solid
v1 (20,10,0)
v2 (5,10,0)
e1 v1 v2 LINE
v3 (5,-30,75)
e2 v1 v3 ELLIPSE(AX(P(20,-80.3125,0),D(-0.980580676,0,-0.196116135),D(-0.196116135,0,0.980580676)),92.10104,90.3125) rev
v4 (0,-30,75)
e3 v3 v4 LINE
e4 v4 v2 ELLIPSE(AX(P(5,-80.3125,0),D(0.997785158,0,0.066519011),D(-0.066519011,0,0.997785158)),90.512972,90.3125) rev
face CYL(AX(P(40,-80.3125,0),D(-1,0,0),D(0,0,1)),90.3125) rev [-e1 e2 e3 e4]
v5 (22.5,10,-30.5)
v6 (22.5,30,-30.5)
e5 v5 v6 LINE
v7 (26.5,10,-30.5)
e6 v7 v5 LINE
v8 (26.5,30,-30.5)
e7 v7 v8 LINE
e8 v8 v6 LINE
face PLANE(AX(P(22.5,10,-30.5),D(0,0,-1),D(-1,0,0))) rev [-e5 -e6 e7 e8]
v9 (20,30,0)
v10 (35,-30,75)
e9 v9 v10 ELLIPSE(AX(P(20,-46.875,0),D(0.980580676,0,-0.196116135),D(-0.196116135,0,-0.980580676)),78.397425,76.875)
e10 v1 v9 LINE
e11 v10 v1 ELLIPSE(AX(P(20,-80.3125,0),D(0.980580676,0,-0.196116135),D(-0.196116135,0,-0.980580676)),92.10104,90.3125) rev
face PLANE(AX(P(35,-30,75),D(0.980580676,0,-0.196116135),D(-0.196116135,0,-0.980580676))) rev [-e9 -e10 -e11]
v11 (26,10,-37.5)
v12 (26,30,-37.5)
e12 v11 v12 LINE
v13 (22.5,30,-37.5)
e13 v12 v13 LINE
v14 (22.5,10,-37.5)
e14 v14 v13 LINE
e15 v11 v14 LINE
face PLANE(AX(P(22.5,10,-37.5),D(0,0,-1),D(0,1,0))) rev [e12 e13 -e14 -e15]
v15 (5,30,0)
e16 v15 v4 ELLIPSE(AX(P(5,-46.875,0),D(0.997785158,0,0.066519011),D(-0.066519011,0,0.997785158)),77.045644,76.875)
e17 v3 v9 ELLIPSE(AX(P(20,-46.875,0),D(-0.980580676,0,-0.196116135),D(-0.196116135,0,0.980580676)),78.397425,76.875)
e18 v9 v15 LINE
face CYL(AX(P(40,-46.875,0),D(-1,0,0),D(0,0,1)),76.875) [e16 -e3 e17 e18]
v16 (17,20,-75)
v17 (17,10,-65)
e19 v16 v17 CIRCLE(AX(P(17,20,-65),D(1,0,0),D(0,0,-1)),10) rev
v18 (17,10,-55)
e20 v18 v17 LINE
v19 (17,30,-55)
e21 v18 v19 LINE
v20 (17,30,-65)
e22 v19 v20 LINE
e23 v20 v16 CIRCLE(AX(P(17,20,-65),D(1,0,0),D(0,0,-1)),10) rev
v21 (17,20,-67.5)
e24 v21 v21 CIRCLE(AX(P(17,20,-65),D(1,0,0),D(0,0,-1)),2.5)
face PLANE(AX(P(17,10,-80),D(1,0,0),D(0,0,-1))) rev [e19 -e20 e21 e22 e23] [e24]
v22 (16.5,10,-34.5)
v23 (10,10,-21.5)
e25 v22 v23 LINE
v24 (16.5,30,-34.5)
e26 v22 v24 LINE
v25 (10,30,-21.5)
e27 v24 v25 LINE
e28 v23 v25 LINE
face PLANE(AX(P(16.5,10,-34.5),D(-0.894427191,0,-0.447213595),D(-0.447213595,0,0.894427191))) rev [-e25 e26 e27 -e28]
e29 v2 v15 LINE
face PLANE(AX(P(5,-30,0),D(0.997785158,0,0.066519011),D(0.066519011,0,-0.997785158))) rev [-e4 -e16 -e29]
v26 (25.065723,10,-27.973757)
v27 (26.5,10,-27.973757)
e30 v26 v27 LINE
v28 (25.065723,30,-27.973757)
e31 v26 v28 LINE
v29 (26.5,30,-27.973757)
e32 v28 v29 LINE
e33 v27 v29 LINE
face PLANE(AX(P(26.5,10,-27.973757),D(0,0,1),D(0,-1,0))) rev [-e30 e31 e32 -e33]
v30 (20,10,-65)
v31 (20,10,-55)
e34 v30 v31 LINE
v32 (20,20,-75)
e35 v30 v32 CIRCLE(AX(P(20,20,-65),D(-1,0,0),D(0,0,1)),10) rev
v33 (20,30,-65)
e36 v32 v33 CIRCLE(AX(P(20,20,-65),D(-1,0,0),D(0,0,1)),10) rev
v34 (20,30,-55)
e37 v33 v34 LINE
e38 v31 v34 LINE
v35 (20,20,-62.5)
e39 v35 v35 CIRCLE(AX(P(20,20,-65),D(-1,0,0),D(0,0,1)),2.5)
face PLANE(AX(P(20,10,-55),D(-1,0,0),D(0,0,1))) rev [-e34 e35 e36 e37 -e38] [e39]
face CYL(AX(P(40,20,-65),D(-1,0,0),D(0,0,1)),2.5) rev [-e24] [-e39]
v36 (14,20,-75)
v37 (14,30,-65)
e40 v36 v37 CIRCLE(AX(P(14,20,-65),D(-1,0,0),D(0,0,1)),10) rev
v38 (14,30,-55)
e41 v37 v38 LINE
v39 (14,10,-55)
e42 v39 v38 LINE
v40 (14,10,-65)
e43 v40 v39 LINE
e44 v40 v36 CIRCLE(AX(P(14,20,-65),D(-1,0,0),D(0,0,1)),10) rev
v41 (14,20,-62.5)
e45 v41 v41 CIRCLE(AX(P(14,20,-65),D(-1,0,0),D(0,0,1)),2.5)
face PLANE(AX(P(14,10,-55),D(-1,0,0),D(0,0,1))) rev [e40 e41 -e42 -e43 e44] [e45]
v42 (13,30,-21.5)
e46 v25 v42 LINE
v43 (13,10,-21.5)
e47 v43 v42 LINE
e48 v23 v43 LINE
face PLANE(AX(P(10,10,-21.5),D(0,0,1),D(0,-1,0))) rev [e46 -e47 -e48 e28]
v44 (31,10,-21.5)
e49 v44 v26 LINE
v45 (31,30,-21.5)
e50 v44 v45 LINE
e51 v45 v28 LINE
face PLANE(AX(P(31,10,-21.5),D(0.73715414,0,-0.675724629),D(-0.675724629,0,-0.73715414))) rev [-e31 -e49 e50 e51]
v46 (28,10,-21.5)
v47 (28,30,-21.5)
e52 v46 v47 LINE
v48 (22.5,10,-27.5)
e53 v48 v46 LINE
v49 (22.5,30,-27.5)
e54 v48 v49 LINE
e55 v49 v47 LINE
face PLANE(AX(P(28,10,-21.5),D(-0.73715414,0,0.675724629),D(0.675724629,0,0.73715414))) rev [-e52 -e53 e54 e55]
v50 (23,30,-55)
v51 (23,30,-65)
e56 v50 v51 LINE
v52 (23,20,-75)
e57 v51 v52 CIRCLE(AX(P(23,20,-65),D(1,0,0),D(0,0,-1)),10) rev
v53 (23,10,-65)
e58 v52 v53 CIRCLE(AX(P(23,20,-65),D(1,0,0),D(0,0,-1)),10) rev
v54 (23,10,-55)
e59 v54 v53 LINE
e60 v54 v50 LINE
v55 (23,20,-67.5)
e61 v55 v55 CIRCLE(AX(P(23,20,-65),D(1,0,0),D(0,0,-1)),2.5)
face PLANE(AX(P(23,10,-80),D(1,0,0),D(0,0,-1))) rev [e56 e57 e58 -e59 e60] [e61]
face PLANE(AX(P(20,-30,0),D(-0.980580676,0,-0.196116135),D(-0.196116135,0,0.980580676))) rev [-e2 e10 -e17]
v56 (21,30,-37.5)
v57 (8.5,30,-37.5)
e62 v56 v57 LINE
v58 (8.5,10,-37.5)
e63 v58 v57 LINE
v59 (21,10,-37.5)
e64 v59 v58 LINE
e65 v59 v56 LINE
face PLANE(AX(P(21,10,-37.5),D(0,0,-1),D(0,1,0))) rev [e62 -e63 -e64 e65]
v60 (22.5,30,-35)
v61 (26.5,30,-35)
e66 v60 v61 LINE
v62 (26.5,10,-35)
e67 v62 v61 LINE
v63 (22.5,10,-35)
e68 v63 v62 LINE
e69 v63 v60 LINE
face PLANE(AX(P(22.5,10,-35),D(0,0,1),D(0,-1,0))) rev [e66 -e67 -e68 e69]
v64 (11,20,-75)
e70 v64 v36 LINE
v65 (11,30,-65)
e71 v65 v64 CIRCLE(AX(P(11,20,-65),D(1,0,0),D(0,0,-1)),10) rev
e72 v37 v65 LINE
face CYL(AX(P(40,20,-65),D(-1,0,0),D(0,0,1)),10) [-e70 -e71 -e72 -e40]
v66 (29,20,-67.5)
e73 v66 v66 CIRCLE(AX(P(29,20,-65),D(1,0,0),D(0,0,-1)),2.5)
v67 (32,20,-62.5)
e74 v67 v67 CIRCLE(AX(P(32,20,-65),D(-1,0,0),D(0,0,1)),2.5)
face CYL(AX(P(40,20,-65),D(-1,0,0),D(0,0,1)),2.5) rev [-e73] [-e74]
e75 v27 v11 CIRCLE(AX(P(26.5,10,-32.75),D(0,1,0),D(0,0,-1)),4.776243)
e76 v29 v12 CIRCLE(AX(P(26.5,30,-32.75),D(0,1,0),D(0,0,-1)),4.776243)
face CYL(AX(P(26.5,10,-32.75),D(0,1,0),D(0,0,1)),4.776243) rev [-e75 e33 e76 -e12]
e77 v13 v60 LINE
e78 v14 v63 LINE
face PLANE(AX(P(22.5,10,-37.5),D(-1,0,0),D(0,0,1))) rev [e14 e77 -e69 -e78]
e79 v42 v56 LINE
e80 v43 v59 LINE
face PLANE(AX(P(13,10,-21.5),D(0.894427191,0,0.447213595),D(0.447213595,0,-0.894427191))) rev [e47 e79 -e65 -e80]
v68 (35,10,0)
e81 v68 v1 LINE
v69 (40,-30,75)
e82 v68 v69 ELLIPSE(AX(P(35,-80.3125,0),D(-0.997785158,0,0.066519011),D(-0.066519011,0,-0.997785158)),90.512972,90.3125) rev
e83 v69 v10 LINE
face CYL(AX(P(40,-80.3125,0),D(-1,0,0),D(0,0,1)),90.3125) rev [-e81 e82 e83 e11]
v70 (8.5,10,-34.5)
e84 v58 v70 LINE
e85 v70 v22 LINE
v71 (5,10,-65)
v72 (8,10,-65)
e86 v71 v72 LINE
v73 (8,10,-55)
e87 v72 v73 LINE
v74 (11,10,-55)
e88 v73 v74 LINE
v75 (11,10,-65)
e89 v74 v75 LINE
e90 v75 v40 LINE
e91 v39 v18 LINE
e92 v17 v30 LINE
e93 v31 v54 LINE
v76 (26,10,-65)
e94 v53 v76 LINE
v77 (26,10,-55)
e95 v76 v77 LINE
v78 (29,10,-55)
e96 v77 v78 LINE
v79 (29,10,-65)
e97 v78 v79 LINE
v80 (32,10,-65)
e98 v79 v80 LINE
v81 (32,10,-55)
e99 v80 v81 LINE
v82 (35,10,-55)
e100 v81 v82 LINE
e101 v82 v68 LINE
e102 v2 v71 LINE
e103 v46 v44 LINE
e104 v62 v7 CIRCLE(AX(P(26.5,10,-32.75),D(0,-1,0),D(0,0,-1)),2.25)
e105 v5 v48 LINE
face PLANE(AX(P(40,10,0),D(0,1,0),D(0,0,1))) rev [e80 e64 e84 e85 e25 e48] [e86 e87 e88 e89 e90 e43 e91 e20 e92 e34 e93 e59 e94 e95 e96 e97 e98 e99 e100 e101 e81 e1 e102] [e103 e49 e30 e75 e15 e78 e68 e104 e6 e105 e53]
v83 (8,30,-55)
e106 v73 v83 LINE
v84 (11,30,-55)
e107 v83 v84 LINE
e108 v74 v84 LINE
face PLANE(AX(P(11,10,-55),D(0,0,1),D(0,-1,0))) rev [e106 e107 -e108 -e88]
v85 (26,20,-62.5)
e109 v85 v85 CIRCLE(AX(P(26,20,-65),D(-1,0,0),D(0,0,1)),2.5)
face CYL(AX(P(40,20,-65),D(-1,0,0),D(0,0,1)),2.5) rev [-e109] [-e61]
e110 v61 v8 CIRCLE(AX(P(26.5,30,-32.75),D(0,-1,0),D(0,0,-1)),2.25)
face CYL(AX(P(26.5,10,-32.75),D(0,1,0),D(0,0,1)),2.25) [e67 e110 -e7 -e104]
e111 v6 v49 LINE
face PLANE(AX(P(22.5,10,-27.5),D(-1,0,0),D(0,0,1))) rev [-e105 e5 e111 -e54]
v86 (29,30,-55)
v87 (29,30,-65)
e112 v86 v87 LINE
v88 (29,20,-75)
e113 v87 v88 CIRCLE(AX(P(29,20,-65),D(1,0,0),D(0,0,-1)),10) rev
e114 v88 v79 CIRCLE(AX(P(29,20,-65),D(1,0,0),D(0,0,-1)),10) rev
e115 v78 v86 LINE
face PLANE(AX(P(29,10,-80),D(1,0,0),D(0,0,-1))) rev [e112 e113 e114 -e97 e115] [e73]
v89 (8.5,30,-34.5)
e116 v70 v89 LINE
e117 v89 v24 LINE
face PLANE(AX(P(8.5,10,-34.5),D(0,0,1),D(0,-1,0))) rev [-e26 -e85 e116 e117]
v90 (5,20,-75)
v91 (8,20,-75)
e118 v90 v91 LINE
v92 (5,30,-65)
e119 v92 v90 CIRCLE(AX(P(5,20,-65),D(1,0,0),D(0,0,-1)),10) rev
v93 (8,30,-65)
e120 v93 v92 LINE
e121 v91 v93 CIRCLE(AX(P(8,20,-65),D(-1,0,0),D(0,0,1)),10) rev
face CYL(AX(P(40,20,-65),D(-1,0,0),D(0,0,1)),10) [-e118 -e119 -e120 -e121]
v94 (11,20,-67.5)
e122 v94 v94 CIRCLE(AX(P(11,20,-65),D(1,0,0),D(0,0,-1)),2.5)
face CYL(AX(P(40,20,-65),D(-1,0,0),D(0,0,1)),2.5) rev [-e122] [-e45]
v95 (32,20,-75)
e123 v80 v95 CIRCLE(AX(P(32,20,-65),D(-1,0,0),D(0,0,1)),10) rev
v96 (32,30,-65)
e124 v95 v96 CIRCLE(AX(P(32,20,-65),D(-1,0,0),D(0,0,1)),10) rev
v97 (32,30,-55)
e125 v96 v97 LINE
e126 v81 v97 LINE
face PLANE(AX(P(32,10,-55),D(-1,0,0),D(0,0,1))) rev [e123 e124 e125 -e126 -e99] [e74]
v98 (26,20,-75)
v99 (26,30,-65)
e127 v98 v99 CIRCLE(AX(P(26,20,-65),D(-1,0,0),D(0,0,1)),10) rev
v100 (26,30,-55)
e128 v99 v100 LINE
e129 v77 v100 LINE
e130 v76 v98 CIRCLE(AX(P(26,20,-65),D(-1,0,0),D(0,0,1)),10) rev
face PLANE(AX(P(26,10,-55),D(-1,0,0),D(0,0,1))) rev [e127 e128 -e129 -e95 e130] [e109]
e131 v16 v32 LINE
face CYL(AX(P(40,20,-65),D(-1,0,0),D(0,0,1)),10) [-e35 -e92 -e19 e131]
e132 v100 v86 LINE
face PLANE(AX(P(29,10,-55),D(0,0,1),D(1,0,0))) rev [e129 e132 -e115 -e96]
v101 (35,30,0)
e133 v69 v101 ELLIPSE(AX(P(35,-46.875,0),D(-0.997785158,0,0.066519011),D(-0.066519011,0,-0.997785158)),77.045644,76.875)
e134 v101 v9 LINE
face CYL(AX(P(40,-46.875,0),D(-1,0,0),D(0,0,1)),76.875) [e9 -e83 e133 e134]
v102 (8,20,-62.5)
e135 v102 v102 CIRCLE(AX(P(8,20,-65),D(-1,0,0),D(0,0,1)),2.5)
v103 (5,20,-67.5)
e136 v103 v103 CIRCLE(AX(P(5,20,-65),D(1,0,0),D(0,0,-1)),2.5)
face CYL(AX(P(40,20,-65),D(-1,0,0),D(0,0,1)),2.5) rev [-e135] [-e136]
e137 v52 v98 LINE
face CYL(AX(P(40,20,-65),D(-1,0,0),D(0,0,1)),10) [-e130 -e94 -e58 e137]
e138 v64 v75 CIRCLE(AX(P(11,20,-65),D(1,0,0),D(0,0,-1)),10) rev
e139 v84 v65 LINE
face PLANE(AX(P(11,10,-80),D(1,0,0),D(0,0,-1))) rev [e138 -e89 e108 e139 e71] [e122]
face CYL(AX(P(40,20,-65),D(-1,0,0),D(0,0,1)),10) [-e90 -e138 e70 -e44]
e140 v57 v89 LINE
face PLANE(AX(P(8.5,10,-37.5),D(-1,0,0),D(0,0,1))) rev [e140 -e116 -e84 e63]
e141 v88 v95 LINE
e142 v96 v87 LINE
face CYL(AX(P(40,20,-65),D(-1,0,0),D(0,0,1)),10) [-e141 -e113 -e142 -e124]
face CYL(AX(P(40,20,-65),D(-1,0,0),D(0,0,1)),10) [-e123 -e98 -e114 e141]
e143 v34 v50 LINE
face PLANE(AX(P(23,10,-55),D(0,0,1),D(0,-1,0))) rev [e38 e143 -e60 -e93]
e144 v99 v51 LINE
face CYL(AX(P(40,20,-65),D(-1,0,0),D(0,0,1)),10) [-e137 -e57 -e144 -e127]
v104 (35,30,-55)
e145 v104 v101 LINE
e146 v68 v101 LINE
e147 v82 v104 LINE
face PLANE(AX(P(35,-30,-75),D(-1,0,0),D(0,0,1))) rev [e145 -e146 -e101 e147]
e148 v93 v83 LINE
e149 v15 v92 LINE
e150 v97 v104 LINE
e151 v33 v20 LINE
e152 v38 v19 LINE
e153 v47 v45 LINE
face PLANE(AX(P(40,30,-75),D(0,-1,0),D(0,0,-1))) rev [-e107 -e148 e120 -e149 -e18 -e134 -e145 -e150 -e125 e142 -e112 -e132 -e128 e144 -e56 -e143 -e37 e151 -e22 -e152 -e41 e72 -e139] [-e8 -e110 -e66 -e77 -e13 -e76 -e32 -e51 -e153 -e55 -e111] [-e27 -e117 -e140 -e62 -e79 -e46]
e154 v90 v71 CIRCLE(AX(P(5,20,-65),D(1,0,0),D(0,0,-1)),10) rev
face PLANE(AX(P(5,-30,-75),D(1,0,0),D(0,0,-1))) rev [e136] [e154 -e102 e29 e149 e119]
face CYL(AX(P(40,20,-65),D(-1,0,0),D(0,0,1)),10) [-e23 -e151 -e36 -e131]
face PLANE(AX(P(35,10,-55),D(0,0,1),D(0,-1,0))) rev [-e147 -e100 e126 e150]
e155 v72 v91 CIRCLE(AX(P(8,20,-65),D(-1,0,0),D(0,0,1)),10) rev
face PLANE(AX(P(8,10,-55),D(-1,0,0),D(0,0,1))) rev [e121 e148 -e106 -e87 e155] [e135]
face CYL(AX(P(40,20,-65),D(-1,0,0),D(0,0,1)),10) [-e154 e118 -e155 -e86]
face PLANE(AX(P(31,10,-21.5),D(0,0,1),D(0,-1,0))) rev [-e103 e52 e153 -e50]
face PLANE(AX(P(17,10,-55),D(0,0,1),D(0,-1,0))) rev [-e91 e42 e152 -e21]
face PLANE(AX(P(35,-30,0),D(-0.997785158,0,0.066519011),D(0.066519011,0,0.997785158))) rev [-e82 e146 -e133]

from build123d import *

# Parameters (mm, degrees)
ESQUISSE1_R             = 2.5
BOSS_EXTRU_1_DEPTH      = 40
ENL_V_MAT_EXTRU_1_DEPTH = 60
CONG_1_R                = 10
ENL_V_MAT_EXTRU_2_DEPTH = 20
ENL_V_MAT_EXTRU_3_DEPTH = 20


with BuildPart() as part:
    # Esquisse1 → Boss.-Extru.1 (new body)
    with BuildSketch(Plane(origin=(0, 0, 0), x_dir=(0, 0, -1), z_dir=(1, 0, 0))):
        with BuildLine():
            Line((0, 10), (75, 10))
            Line((75, 10), (75, 30))
            Line((75, 30), (0, 30))
            ThreePointArc((0, 30), (-48.023431781, 13.154289726), (-75, -30))
            ThreePointArc((-75, -30), (-42.5, -0.625), (0, 10))
        make_face()
        with Locations((65, 20)):
            Circle(ESQUISSE1_R, mode=Mode.SUBTRACT)
    extrude(amount=BOSS_EXTRU_1_DEPTH)

    # Esquisse2 → Enlèv. mat.-Extru.1 (cut)
    with BuildSketch(Plane(origin=(0, 30, 0), x_dir=(1, 0, 0), z_dir=(0, 1, 0))):
        Polygon((20, 0), (5, -75), (35, -75), align=None)
        Polygon((0, 75), (5, 75), (5, 0), (0, -75), align=None)
        Polygon((40, 75), (35, 75), (35, 0), (40, -75), align=None)
    extrude(amount=-ENL_V_MAT_EXTRU_1_DEPTH, mode=Mode.SUBTRACT)

    # Congé1
    cong_1_edges = [part.edges().sort_by_distance(p)[0] for p in [
        (20, 10, -75),
        (20, 30, -75),
    ]]
    fillet(cong_1_edges, radius=CONG_1_R - 0.0001)  # a hair under: the kernel refuses the full size

    # Esquisse3 → Enlèv. mat.-Extru.2 (cut)
    with BuildSketch(Plane(origin=(0, 30, 0), x_dir=(1, 0, 0), z_dir=(0, 1, 0))):
        Polygon((35, 82), (35, 55), (32, 55), (32, 80), (29, 80), (29, 55), (26, 55), (26, 80), (23, 80), (23, 55), (20, 55), (20, 80), (17, 80), (17, 55), (14, 55), (14, 80), (11, 80), (11, 55), (8, 55), (8, 82), align=None)
    extrude(amount=-ENL_V_MAT_EXTRU_2_DEPTH, mode=Mode.SUBTRACT)

    # Esquisse4 → Enlèv. mat.-Extru.3 (cut)
    with BuildSketch(Plane(origin=(0, 30, 0), x_dir=(1, 0, 0), z_dir=(0, 1, 0))):
        Polygon((8.5, 37.5), (8.5, 34.5), (16.5, 34.5), (10, 21.5), (13, 21.5), (21, 37.5), align=None)
        with BuildLine():
            Line((31, 21.5), (28, 21.5))
            Line((28, 21.5), (22.5, 27.5))
            Line((22.5, 27.5), (22.5, 30.5))
            Line((22.5, 30.5), (26.5, 30.5))
            ThreePointArc((26.5, 30.5), (28.75, 32.75), (26.5, 35))
            Line((26.5, 35), (22.5, 35))
            Line((22.5, 35), (22.5, 37.5))
            Line((22.5, 37.5), (26, 37.5))
            ThreePointArc((26, 37.5), (31.269677958, 33.000344118), (26.5, 27.973756706))
            Line((26.5, 27.973756706), (25.065723019, 27.973756706))
            Line((25.065723019, 27.973756706), (31, 21.5))
        make_face()
    extrude(amount=-ENL_V_MAT_EXTRU_3_DEPTH, mode=Mode.SUBTRACT)


solid = part.part
